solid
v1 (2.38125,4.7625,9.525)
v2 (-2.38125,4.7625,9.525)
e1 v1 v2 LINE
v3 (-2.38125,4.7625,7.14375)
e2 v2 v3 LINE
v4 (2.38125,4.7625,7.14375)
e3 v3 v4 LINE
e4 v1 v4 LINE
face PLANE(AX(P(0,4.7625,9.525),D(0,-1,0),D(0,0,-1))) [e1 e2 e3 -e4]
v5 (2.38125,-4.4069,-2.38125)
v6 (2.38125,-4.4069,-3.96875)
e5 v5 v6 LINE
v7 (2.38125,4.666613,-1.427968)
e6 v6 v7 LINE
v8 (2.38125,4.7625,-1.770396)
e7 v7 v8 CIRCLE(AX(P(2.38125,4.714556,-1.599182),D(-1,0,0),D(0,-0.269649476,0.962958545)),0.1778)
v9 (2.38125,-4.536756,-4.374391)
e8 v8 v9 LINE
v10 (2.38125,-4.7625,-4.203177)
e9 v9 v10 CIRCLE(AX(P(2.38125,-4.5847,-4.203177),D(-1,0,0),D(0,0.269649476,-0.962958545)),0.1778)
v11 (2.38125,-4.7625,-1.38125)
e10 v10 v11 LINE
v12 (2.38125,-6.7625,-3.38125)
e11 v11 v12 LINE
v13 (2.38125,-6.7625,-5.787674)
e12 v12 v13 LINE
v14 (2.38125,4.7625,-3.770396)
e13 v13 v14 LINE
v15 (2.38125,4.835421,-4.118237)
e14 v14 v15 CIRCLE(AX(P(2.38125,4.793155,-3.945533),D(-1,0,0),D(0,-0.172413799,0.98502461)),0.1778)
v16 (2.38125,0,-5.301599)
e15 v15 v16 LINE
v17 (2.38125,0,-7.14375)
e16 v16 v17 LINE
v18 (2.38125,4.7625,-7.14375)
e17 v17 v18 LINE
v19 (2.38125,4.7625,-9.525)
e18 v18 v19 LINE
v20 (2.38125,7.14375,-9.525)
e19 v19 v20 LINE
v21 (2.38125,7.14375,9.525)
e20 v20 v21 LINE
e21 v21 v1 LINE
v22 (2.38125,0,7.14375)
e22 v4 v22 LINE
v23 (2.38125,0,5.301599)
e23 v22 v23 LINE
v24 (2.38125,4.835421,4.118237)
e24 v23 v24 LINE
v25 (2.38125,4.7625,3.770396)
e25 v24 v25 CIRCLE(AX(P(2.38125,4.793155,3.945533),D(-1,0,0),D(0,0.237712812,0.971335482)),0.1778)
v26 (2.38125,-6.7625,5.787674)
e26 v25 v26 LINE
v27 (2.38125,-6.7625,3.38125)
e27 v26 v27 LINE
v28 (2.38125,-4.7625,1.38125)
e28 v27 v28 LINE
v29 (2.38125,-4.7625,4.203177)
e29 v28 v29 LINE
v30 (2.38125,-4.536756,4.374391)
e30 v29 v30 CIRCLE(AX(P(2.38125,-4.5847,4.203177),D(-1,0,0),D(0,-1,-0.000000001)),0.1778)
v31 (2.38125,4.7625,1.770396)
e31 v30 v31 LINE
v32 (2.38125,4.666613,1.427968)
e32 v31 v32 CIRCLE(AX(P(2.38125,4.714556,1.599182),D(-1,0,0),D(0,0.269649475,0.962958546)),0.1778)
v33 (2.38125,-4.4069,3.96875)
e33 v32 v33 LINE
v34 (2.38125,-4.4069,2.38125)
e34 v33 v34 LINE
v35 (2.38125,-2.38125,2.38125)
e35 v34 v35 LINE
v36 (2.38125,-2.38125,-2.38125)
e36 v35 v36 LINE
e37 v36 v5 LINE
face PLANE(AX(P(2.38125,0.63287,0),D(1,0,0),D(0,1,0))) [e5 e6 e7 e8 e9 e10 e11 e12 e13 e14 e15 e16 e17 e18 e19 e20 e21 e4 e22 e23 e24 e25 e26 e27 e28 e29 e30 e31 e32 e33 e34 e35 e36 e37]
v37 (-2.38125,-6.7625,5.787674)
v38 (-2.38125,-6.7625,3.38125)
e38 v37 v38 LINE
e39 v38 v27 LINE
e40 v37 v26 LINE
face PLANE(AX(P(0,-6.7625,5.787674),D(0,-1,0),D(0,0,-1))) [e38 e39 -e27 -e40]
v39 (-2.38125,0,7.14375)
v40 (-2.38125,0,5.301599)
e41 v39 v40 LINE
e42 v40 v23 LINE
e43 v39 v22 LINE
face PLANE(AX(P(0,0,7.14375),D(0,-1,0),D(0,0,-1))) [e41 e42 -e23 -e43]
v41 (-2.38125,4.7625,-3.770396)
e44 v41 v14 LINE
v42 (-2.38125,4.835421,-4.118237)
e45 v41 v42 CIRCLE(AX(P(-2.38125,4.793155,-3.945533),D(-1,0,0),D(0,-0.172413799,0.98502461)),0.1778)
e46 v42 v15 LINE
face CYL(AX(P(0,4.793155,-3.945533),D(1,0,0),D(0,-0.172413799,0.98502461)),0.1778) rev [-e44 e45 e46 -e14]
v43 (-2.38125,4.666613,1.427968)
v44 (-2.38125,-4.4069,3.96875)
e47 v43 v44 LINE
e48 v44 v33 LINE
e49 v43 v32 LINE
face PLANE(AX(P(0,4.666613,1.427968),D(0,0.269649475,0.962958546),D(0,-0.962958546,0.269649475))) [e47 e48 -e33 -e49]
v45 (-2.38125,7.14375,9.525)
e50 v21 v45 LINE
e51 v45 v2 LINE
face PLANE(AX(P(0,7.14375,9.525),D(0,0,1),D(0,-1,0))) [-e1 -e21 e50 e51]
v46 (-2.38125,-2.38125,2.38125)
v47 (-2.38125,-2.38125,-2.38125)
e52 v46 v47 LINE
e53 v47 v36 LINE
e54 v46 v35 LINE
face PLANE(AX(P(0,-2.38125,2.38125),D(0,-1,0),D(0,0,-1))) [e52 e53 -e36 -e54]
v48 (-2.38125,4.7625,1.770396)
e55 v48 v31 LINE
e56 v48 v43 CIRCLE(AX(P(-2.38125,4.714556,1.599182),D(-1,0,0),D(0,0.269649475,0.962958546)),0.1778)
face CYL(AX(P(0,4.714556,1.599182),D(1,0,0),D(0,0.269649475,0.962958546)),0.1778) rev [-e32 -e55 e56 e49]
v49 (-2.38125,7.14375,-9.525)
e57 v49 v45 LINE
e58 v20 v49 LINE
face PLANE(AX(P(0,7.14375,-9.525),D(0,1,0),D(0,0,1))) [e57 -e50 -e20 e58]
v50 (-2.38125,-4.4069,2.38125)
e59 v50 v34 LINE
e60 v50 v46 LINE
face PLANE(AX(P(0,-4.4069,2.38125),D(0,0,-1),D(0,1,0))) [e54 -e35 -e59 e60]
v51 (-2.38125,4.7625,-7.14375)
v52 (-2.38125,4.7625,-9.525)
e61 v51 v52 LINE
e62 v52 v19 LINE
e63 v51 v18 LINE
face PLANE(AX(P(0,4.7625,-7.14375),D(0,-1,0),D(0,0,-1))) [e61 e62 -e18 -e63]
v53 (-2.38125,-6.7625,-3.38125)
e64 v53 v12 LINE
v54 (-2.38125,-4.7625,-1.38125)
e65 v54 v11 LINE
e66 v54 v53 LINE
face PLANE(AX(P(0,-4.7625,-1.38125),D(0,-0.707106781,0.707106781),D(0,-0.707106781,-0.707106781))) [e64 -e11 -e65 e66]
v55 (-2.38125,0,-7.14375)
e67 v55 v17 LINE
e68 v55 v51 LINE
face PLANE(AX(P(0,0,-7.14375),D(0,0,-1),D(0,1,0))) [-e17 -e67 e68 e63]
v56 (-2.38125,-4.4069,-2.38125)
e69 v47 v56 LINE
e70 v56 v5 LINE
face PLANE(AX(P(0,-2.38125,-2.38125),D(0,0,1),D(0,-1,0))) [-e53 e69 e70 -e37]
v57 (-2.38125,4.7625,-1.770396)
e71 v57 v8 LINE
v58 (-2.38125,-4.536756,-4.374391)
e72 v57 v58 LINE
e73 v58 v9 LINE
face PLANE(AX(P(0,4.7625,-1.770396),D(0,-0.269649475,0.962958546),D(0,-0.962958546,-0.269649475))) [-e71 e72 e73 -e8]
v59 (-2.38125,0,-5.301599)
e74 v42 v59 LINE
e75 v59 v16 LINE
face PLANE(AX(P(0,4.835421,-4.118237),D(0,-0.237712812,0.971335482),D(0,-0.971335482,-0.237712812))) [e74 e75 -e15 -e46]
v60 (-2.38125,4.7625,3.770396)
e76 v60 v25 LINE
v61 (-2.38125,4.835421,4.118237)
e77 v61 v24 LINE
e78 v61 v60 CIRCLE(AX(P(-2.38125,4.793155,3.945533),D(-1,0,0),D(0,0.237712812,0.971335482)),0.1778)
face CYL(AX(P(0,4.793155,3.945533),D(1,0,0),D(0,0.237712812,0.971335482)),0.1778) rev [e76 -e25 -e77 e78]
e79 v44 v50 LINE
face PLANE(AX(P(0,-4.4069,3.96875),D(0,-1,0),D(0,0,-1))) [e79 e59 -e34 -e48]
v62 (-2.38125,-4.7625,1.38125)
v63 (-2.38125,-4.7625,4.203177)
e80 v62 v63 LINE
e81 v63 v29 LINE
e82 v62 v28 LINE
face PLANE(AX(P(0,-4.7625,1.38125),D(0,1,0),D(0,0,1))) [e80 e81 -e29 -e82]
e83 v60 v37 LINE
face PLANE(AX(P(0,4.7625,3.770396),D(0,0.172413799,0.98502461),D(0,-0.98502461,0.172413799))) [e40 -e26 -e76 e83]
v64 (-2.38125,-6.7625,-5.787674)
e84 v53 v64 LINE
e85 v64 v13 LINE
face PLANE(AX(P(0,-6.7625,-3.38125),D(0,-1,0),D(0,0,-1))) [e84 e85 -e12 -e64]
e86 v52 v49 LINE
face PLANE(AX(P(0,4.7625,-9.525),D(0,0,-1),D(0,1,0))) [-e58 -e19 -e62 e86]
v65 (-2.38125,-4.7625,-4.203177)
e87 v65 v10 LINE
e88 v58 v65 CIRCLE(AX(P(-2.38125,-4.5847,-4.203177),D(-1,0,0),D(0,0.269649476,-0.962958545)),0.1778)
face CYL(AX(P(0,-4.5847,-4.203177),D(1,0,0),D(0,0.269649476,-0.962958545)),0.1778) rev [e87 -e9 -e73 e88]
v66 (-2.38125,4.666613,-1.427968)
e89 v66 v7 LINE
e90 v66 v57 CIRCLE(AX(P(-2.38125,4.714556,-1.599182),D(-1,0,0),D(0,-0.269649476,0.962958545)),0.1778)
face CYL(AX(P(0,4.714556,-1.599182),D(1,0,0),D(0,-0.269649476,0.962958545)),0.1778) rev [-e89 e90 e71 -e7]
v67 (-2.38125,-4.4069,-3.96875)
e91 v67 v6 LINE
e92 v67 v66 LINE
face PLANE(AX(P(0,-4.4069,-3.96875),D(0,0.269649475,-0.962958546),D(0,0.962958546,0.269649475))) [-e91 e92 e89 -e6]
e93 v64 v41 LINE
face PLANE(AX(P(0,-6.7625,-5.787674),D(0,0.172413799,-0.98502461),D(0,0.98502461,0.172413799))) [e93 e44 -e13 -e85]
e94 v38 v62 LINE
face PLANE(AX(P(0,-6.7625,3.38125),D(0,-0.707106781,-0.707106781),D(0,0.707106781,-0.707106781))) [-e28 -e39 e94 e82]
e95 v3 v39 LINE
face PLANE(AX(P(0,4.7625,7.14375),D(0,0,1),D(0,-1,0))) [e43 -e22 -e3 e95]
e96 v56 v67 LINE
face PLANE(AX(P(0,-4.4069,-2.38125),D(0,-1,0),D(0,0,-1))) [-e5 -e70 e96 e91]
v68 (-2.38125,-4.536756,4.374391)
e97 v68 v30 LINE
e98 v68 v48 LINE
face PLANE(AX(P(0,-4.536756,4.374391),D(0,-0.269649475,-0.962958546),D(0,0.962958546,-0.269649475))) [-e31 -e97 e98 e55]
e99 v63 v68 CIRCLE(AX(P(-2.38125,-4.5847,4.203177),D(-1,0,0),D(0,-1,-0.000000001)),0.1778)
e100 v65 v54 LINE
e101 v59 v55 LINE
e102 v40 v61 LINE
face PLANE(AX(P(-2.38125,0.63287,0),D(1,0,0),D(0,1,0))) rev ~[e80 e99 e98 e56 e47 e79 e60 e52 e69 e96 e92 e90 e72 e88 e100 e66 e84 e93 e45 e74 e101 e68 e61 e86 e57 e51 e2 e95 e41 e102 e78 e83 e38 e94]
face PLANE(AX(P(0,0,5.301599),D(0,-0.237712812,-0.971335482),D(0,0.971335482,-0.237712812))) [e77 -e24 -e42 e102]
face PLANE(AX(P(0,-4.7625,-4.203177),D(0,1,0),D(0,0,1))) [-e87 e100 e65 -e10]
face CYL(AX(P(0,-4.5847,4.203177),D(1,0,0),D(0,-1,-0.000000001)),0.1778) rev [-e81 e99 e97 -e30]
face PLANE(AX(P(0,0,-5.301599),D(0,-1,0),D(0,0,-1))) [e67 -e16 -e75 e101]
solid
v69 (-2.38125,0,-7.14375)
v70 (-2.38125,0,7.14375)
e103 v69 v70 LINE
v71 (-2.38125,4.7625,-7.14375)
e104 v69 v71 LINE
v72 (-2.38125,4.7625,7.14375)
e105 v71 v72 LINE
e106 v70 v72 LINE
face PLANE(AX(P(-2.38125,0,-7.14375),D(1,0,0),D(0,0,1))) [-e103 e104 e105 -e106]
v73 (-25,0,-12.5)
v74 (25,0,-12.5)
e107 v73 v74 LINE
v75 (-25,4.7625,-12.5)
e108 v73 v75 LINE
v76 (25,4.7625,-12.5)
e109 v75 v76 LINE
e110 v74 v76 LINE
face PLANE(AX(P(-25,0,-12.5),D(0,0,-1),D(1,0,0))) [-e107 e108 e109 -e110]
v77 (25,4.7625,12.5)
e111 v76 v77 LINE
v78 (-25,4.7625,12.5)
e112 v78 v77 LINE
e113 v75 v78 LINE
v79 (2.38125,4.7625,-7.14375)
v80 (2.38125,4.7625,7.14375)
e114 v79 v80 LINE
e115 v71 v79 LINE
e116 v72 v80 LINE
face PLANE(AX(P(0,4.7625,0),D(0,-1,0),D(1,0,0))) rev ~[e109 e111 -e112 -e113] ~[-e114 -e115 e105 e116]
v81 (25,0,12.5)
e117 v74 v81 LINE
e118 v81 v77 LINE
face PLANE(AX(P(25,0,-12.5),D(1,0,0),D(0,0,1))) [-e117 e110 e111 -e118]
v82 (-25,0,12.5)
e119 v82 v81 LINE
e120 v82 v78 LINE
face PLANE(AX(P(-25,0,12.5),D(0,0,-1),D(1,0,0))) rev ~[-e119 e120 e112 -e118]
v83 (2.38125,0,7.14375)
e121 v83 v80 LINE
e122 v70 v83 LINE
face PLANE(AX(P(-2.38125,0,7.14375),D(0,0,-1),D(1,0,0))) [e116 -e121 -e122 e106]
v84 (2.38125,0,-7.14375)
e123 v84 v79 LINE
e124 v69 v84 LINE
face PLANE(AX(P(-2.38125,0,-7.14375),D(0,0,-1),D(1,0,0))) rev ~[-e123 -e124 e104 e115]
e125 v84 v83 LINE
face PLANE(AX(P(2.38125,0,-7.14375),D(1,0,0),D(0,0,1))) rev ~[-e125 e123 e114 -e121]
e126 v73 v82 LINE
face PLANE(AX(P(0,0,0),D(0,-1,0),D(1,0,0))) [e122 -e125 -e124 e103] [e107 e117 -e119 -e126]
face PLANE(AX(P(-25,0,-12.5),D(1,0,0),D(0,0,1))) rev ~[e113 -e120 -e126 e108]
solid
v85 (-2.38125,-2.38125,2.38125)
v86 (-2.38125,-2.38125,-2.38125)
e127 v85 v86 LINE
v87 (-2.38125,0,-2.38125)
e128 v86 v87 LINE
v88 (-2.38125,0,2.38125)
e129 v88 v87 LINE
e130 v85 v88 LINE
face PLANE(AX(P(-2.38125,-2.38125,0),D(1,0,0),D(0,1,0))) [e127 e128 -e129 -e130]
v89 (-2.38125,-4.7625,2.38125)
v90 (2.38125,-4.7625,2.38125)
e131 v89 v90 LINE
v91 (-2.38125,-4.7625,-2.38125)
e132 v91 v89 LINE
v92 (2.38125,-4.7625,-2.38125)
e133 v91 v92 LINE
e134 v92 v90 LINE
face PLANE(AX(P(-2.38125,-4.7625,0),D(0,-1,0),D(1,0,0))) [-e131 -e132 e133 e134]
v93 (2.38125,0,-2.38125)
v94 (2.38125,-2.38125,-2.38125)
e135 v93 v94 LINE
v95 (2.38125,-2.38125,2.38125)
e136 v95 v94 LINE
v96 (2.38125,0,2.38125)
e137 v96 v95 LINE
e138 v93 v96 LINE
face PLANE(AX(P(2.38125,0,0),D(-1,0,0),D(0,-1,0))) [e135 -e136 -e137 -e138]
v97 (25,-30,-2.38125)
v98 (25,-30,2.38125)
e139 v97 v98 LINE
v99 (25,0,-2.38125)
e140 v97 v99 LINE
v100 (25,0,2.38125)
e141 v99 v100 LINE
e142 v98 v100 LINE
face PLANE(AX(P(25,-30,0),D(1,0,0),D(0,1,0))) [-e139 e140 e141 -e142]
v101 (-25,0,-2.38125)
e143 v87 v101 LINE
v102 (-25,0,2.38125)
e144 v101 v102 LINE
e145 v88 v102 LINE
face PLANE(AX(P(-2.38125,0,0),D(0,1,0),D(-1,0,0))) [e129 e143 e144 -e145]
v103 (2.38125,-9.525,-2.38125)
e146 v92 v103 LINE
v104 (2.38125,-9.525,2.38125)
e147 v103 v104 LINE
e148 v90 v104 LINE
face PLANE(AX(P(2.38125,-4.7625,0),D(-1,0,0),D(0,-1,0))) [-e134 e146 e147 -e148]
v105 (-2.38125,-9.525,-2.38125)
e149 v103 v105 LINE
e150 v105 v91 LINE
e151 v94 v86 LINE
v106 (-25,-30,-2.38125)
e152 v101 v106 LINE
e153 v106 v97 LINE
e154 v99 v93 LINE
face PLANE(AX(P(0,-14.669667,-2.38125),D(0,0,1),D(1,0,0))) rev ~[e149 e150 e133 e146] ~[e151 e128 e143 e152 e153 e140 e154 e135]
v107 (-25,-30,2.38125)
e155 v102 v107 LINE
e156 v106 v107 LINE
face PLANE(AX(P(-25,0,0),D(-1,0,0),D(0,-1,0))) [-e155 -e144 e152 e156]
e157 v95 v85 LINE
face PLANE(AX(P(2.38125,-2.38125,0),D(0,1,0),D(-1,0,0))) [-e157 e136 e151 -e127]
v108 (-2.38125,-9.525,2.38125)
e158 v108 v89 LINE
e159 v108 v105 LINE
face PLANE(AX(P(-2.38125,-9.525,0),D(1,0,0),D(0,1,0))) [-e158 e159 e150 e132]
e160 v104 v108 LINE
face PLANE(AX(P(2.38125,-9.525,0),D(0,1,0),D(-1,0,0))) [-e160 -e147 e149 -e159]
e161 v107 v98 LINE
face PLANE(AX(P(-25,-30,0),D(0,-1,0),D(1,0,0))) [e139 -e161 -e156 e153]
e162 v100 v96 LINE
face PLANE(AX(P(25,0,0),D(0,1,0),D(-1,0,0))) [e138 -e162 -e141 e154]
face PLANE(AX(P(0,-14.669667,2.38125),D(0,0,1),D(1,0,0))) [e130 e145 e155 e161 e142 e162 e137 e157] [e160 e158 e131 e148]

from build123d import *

# Parameters (mm, degrees)
F2_DEPTH = 2.38125
F3_W     = 50
F3_H     = 25
F3_W_2   = 4.7625
F3_H_2   = 14.2875
F4_DEPTH = 4.7625
F6_DEPTH = 2.38125


# Not quite as in the source:
# - a length typed as a fraction of an inch, garbled in the dataset ("3 / 203.2 mm" for 3/8 in), is restored


with BuildPart() as f2:
    # F1 (on Top) → F2 (new body, symmetric)
    with BuildSketch(Plane.XY):
        Polygon((-2.38125, 0), (-25, 0), (-25, -30), (0, -30), (25, -30), (25, 0), (2.38125, 0), (2.38125, -2.38125), (0, -2.38125), (-2.38125, -2.38125), align=None)
        Polygon((-2.38125, -4.7625), (0, -4.7625), (2.38125, -4.7625), (2.38125, -9.525), (0, -9.525), (-2.38125, -9.525), align=None, mode=Mode.SUBTRACT)
    extrude(amount=F2_DEPTH, both=True)


with BuildPart() as f4:
    # F3 (on Front) → F4 (new body)
    with BuildSketch(Plane.XZ):
        Rectangle(F3_W, F3_H)
        Rectangle(F3_W_2, F3_H_2, mode=Mode.SUBTRACT)
    extrude(amount=-F4_DEPTH)


with BuildPart() as f6:
    # F5 (on Right) → F6 (new body, symmetric)
    with BuildSketch(Plane.YZ):
        with BuildLine():
            Line((4.7625, 9.525), (4.7625, 7.14375))
            Line((4.7625, 7.14375), (0, 7.14375))
            Line((0, 7.14375), (0, 5.3015985947))
            Line((0, 5.3015985947), (4.8354205115, 4.1182366897))
            ThreePointArc((4.8354205115, 4.1182366897), (4.9671724392, 3.9090526811), (4.7625, 3.7703958653))
            Line((4.7625, 3.7703958653), (-6.7625, 5.7876744365))
            Line((-6.7625, 5.7876744365), (-6.7625, 3.38125))
            Line((-6.7625, 3.38125), (-4.7625, 1.38125))
            Line((-4.7625, 1.38125), (-4.7625, 2.38125))
            Line((-4.7625, 2.38125), (-4.7625, 4.2031772012))
            ThreePointArc((-4.7625, 4.2031772012), (-4.6921440652, 4.3448409329), (-4.5367563233, 4.3743912306))
            Line((-4.5367563233, 4.3743912306), (4.7625, 1.7703958653))
            ThreePointArc((4.7625, 1.7703958653), (4.8857703527, 1.5512381592), (4.6666126465, 1.4279678065))
            Line((4.6666126465, 1.4279678065), (-4.4069, 3.96875))
            Line((-4.4069, 3.96875), (-4.4069, 2.38125))
            Line((-4.4069, 2.38125), (-2.38125, 2.38125))
            Line((-2.38125, 2.38125), (-2.38125, 0))
            Line((-2.38125, 0), (-2.38125, -2.38125))
            Line((-2.38125, -2.38125), (-4.4069, -2.38125))
            Line((-4.4069, -2.38125), (-4.4069, -3.96875))
            Line((-4.4069, -3.96875), (4.6666126465, -1.4279678065))
            ThreePointArc((4.6666126465, -1.4279678065), (4.8857703527, -1.5512381592), (4.7625, -1.7703958653))
            Line((4.7625, -1.7703958653), (-4.5367563233, -4.3743912306))
            ThreePointArc((-4.5367563233, -4.3743912306), (-4.6921440652, -4.3448409329), (-4.7625, -4.2031772012))
            Line((-4.7625, -4.2031772012), (-4.7625, -2.38125))
            Line((-4.7625, -2.38125), (-4.7625, -1.38125))
            Line((-4.7625, -1.38125), (-6.7625, -3.38125))
            Line((-6.7625, -3.38125), (-6.7625, -5.7876744365))
            Line((-6.7625, -5.7876744365), (4.7625, -3.7703958653))
            ThreePointArc((4.7625, -3.7703958653), (4.9671724392, -3.9090526811), (4.8354205115, -4.1182366897))
            Line((4.8354205115, -4.1182366897), (0, -5.3015985947))
            Line((0, -5.3015985947), (0, -7.14375))
            Line((0, -7.14375), (4.7625, -7.14375))
            Line((4.7625, -7.14375), (4.7625, -9.525))
            Line((4.7625, -9.525), (7.14375, -9.525))
            Line((7.14375, -9.525), (7.14375, 0))
            Line((7.14375, 0), (7.14375, 9.525))
            Line((7.14375, 9.525), (4.7625, 9.525))
        make_face()
    extrude(amount=F6_DEPTH, both=True)


solid = Compound([f2.part, f4.part, f6.part])
